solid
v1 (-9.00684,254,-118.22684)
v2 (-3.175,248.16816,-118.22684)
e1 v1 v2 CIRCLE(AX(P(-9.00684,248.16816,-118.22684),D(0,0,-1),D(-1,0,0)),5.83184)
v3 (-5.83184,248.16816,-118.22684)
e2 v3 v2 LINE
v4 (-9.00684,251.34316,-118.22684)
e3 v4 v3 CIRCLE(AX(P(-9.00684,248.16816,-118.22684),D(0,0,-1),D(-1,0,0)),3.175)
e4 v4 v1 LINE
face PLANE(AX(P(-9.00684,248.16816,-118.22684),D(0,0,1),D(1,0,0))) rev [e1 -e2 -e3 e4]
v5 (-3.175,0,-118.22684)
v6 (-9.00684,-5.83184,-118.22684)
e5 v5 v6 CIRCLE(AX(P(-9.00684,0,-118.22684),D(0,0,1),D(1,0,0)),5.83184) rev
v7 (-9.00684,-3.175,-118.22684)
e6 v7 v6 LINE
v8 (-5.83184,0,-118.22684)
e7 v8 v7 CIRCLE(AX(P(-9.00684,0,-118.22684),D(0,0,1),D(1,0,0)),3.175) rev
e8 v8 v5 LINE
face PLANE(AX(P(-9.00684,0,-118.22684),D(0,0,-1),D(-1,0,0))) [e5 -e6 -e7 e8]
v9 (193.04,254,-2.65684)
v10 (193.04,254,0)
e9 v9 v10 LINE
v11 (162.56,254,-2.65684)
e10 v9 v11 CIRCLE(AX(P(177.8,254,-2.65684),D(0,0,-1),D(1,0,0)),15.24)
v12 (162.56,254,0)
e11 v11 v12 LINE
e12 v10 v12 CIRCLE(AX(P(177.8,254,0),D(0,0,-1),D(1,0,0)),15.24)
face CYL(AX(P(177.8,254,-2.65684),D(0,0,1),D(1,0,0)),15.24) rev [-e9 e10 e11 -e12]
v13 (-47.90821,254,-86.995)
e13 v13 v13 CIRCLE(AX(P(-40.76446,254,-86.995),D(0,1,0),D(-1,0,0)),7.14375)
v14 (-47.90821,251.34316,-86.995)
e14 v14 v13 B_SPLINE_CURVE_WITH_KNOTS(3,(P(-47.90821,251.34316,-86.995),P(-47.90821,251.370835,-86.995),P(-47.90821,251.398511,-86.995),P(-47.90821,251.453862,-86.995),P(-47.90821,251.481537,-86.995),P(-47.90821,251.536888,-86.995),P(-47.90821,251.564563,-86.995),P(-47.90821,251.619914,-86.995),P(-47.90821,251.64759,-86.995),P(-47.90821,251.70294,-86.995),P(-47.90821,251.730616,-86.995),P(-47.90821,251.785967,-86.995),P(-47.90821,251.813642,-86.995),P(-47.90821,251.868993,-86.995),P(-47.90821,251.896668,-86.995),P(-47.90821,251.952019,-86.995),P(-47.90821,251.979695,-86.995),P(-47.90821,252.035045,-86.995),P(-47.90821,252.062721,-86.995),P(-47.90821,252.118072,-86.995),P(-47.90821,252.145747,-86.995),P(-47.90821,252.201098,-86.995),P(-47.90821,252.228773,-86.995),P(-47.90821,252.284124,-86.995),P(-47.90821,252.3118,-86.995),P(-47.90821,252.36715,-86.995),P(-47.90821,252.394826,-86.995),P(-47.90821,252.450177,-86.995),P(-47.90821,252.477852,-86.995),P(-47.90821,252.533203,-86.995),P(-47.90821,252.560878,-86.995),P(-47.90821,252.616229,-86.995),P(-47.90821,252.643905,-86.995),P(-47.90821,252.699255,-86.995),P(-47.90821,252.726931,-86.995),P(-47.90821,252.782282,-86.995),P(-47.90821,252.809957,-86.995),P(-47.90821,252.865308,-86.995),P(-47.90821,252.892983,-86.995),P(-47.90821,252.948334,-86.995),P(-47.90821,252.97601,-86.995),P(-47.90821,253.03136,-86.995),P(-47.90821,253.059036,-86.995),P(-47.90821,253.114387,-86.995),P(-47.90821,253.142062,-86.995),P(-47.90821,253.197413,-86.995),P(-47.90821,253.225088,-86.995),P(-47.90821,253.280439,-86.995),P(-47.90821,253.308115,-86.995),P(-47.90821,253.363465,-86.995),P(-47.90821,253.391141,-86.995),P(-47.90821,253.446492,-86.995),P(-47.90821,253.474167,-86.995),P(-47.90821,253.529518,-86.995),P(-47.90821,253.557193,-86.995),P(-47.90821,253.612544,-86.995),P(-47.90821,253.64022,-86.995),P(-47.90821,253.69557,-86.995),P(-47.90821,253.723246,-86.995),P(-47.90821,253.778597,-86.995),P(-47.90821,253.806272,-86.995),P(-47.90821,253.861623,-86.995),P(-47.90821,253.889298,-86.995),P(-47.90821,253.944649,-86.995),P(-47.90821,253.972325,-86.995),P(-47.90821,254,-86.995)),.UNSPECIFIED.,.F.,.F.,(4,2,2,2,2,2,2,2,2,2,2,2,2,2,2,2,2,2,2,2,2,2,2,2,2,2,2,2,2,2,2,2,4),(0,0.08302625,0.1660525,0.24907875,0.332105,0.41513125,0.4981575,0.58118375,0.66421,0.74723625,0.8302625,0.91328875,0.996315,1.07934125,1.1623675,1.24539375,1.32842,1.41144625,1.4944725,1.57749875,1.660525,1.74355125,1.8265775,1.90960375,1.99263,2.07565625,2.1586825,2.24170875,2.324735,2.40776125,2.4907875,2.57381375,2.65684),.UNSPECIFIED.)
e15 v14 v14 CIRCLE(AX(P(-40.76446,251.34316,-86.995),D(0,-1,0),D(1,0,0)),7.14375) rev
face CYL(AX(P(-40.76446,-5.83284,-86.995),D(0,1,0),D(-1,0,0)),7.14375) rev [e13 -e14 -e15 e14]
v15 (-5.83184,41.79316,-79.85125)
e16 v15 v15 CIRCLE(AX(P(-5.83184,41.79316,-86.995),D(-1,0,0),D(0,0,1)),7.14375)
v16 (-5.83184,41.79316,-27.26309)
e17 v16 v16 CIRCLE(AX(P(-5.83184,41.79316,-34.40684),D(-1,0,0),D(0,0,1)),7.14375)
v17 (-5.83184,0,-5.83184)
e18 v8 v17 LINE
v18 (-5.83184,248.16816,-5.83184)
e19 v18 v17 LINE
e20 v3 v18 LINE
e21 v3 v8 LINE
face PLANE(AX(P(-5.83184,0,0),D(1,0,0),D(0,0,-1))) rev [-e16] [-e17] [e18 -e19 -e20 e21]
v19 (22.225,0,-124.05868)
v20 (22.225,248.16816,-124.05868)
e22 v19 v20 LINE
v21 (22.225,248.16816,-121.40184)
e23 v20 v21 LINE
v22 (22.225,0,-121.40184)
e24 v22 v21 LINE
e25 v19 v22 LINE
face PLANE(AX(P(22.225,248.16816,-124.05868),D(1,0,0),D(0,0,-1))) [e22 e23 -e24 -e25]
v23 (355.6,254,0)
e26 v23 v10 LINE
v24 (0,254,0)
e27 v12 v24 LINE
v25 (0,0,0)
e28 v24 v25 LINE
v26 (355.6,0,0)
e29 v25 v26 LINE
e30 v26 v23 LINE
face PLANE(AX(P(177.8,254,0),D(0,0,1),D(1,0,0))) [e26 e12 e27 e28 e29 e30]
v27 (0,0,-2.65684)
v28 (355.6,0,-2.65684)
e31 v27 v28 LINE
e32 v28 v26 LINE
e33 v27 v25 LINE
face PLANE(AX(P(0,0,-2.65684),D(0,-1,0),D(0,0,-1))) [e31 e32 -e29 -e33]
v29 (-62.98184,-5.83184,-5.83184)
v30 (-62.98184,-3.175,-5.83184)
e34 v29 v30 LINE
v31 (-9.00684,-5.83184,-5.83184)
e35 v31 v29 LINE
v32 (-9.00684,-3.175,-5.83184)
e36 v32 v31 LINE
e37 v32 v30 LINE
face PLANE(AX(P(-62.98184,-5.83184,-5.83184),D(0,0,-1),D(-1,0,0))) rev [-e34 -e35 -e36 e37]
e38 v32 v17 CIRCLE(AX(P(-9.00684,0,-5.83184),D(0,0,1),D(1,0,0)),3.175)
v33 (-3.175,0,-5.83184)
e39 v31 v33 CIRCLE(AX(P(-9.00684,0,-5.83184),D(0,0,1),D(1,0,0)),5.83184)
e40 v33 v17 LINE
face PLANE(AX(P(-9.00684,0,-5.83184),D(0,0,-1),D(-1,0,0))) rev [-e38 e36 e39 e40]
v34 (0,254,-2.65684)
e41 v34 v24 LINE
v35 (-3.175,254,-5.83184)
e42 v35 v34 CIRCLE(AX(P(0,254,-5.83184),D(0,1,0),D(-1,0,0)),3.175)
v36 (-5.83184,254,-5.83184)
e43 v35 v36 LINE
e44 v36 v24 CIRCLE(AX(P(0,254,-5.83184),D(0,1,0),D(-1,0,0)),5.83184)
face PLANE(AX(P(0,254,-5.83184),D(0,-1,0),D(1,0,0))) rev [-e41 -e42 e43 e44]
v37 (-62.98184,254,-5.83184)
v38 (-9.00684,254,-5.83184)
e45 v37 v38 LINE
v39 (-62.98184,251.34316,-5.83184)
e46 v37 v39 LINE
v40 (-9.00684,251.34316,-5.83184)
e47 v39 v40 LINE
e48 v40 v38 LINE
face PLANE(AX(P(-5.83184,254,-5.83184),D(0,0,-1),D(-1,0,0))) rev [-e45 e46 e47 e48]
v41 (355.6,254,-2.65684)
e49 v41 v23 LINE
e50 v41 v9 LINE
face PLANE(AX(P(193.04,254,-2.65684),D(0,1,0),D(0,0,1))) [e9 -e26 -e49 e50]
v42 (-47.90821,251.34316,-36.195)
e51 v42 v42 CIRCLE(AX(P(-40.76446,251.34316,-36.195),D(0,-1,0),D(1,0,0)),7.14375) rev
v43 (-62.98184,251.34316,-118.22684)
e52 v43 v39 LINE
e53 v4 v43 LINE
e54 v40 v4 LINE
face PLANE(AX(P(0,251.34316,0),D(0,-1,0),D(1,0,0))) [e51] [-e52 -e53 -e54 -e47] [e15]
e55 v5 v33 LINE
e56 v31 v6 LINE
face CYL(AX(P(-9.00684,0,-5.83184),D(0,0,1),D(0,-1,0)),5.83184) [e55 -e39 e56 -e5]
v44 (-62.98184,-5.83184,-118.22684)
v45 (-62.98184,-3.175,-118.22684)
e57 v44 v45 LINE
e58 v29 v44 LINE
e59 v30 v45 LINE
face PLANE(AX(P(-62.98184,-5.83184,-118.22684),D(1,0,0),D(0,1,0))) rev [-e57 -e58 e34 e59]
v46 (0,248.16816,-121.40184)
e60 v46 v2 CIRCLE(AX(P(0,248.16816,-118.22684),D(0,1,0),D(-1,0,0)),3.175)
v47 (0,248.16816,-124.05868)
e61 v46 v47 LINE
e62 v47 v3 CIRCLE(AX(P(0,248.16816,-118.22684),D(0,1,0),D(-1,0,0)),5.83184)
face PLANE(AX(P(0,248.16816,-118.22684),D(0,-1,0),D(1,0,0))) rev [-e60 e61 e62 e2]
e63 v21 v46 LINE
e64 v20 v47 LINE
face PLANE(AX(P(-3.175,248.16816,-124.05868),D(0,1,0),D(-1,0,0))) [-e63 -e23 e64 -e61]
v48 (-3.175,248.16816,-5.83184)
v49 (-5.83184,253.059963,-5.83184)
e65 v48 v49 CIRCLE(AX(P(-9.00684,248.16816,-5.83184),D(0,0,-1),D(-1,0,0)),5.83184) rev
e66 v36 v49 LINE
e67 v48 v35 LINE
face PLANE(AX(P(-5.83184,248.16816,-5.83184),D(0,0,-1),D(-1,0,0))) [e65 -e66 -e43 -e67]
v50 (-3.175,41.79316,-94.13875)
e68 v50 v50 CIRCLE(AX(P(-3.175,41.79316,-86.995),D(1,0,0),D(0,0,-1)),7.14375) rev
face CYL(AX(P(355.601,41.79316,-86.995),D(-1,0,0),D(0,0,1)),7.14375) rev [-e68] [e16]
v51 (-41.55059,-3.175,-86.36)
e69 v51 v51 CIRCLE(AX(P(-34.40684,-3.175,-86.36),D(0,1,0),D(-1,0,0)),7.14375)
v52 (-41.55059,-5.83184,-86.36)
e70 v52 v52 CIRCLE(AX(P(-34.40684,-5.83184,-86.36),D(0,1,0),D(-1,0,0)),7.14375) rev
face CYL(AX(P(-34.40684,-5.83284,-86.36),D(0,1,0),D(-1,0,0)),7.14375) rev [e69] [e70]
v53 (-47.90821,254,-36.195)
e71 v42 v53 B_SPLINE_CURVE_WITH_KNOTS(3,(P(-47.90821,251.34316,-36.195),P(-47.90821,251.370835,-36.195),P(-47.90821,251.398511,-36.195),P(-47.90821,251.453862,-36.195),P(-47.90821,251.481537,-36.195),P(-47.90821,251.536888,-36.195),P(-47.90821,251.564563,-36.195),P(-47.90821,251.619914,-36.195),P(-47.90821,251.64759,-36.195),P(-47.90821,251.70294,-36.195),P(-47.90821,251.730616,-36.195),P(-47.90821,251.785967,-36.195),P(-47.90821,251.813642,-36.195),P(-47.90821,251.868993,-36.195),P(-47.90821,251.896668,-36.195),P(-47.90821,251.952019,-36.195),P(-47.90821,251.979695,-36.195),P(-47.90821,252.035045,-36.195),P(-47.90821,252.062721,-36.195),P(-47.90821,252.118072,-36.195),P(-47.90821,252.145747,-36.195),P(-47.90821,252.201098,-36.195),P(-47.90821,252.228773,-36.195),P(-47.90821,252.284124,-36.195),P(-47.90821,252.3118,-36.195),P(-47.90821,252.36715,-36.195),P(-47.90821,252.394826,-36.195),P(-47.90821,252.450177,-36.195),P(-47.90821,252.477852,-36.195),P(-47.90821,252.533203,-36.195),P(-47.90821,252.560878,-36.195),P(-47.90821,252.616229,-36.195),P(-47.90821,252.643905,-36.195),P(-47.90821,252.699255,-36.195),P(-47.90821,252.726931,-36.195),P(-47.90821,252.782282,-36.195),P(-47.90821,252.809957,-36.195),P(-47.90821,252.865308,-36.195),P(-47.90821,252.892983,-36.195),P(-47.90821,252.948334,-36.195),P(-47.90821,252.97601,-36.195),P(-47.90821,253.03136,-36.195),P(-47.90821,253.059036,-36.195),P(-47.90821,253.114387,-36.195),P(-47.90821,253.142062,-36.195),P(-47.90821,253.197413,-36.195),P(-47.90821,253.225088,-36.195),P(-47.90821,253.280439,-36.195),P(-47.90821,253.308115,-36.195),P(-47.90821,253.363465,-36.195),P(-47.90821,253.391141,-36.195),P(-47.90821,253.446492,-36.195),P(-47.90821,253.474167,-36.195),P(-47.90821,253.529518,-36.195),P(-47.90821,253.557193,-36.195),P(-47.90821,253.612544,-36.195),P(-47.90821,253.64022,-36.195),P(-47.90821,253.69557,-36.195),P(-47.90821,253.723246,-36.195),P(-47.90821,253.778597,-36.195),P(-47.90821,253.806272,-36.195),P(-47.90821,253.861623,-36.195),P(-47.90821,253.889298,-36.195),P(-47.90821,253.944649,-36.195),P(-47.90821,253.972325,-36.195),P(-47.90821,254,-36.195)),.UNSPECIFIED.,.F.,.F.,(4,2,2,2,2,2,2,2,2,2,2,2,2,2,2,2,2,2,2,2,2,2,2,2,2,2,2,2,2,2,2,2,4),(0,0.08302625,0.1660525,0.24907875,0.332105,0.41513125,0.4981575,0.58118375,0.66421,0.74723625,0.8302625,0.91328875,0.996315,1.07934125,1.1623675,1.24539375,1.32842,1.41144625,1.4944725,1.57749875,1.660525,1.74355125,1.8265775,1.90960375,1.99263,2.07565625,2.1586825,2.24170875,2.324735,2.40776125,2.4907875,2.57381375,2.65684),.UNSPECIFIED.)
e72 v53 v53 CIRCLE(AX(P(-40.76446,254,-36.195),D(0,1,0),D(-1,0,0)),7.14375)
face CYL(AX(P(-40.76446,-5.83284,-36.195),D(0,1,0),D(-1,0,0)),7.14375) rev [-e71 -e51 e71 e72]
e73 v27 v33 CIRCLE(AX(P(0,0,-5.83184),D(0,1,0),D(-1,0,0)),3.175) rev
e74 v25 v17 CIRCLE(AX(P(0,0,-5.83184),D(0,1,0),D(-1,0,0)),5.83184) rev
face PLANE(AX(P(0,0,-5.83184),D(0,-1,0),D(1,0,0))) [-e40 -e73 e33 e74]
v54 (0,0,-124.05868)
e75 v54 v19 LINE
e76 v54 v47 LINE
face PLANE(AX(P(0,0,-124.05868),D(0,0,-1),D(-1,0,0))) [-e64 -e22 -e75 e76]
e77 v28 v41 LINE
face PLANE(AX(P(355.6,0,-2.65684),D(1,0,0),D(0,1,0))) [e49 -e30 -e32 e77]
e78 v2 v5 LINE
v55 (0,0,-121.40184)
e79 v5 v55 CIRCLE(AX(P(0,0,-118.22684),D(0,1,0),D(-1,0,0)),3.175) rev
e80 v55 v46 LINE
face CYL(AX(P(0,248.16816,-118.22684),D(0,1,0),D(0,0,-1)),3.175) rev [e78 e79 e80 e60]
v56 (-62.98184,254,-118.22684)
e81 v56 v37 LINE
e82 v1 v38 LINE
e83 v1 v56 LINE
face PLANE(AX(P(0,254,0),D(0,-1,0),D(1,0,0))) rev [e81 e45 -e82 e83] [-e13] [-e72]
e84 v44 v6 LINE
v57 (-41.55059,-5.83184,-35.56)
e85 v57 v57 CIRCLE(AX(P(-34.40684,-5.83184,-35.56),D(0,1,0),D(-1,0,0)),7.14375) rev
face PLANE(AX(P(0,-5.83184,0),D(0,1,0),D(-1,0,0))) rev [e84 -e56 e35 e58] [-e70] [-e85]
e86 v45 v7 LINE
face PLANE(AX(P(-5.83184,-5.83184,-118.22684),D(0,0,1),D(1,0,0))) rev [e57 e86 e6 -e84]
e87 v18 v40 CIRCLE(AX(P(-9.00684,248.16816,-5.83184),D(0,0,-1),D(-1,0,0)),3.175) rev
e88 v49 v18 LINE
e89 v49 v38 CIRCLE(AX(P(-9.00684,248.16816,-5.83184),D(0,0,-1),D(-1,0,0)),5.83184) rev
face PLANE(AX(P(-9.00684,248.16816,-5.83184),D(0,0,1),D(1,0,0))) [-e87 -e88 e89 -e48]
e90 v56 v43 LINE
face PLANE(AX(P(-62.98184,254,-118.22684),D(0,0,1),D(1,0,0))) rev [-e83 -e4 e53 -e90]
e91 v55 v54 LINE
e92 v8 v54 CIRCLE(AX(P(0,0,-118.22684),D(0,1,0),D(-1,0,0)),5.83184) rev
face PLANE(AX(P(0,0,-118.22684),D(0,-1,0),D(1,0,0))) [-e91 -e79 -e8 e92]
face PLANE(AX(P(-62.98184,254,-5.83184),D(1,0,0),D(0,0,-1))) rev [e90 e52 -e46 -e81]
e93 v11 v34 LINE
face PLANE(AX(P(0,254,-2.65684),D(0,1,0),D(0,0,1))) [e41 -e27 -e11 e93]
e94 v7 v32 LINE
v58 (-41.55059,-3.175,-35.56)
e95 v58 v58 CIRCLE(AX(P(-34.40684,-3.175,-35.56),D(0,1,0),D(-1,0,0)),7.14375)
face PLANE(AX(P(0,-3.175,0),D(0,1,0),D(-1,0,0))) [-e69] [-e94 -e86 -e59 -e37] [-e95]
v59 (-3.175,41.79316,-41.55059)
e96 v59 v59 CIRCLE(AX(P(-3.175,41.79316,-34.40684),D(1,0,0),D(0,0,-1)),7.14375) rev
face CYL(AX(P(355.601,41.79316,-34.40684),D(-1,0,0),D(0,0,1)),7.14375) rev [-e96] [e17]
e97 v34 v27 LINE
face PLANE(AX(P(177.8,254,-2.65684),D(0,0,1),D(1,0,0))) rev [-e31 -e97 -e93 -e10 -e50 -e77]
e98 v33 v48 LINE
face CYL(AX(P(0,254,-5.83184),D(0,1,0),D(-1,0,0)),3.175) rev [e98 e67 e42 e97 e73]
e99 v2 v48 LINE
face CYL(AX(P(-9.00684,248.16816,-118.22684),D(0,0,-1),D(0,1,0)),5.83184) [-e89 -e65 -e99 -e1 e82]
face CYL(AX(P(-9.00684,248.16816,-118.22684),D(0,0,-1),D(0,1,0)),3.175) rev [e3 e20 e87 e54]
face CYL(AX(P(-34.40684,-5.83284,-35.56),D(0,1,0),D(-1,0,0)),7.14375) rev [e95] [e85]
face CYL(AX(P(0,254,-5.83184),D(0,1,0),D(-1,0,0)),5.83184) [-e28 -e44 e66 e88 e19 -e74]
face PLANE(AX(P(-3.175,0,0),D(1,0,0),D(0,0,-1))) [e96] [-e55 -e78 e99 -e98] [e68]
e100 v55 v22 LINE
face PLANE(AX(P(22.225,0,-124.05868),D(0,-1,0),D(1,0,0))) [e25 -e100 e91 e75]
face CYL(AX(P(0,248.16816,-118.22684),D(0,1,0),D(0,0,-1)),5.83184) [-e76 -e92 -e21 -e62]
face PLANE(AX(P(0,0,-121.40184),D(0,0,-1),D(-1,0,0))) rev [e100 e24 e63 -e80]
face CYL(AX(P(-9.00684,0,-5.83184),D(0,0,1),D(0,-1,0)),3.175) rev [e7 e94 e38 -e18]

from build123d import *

# Parameters (mm, degrees)
BASE_FLANGE1_DEPTH           = 2.65684
EDGE_FLANGE1_DEPTH           = 254
EDGE_FLANGE2_STRIP_W         = 16.97736
EDGE_FLANGE2_STRIP_H         = 2.65684
EDGE_FLANGE2_STRIP_CUT_DEPTH = 112.395
EDGE_FLANGE2_DEPTH           = 112.395
EDGE_FLANGE3_DEPTH           = 112.395
EDGE_FLANGE4_DEPTH           = 248.16816
SKETCH22_R                   = 7.14375
CUT_EXTRUDE1_DEPTH           = 2.65684
SKETCH23_R                   = 7.14375
CUT_EXTRUDE2_DEPTH           = 2.65684
SKETCH24_R                   = 7.14375
CUT_EXTRUDE3_DEPTH           = 2.65684


# Sheet-metal steps are written as plain solids
with BuildPart() as part:
    # Sketch1 → Base-Flange1 (new body)
    with BuildSketch(Plane.XY):
        with BuildLine():
            Line((0, 0), (355.6, 0))
            Line((355.6, 0), (355.6, 254))
            Line((355.6, 254), (193.04, 254))
            ThreePointArc((193.04, 254), (177.8, 238.76), (162.56, 254))
            Line((162.56, 254), (0, 254))
            Line((0, 254), (0, 0))
        make_face()
    extrude(amount=-BASE_FLANGE1_DEPTH)

    # Edge-Flange1 section (across the edge) → Edge-Flange1 (add)
    with BuildSketch(Plane(origin=(-3.175, 0, -2.65684), x_dir=(1, 0, 0), z_dir=(0, 1, 0))):
        with BuildLine():
            Line((-2.65684, 3.175), (-2.65684, 115.57))
            Line((-2.65684, 115.57), (0, 115.57))
            Line((0, 115.57), (0, 3.175))
            ThreePointArc((0, 3.175), (0.92993597, 0.92993597), (3.175, 0))
            Line((3.175, 0), (3.175, -2.65684))
            ThreePointArc((3.175, -2.65684), (-0.948733611, -0.948733611), (-2.65684, 3.175))
        make_face()
    extrude(amount=EDGE_FLANGE1_DEPTH)

    # Edge-Flange2 strip (across the edge) → Edge-Flange2 strip cut (cut)
    with BuildSketch(Plane(origin=(-5.83184, 254, -5.83184), x_dir=(0, -1, 0), z_dir=(0, 0, -1))):
        with Locations((-2.65684, -1.32842)):
            Rectangle(EDGE_FLANGE2_STRIP_W, EDGE_FLANGE2_STRIP_H)
    extrude(amount=EDGE_FLANGE2_STRIP_CUT_DEPTH, mode=Mode.SUBTRACT)

    # Edge-Flange2 section (across the edge) → Edge-Flange2 (add)
    with BuildSketch(Plane(origin=(-5.83184, 254, -5.83184), x_dir=(0, -1, 0), z_dir=(0, 0, -1))):
        with BuildLine():
            Line((0, 3.175), (0, 57.15))
            Line((0, 57.15), (2.65684, 57.15))
            Line((2.65684, 57.15), (2.65684, 3.175))
            ThreePointArc((2.65684, 3.175), (3.58677597, 0.92993597), (5.83184, 0))
            Line((5.83184, 0), (5.83184, -2.65684))
            ThreePointArc((5.83184, -2.65684), (1.708106389, -0.948733611), (0, 3.175))
        make_face()
    extrude(amount=EDGE_FLANGE2_DEPTH)

    # Edge-Flange3 section (across the edge) → Edge-Flange3 (add)
    with BuildSketch(Plane(origin=(-5.83184, -3.175, -118.22684), x_dir=(0, 1, 0), z_dir=(0, 0, 1))):
        with BuildLine():
            Line((-2.65684, 3.175), (-2.65684, 57.15))
            Line((-2.65684, 57.15), (0, 57.15))
            Line((0, 57.15), (0, 3.175))
            ThreePointArc((0, 3.175), (0.92993597, 0.92993597), (3.175, 0))
            Line((3.175, 0), (3.175, -2.65684))
            ThreePointArc((3.175, -2.65684), (-0.948733611, -0.948733611), (-2.65684, 3.175))
        make_face()
    extrude(amount=EDGE_FLANGE3_DEPTH)

    # Edge-Flange4 section (across the edge) → Edge-Flange4 (add)
    with BuildSketch(Plane(origin=(-3.175, 0, -121.40184), x_dir=(0, 0, 1), z_dir=(0, 1, 0))):
        with BuildLine():
            Line((-2.65684, 3.175), (-2.65684, 25.4))
            Line((-2.65684, 25.4), (0, 25.4))
            Line((0, 25.4), (0, 3.175))
            ThreePointArc((0, 3.175), (0.92993597, 0.92993597), (3.175, 0))
            Line((3.175, 0), (3.175, -2.65684))
            ThreePointArc((3.175, -2.65684), (-0.948733611, -0.948733611), (-2.65684, 3.175))
        make_face()
    extrude(amount=EDGE_FLANGE4_DEPTH)

    # Sketch22 → Cut-Extrude1 (cut)
    with BuildSketch(Plane(origin=(0, 254, 0), x_dir=(1, 0, 0), z_dir=(0, 1, 0))):
        with Locations(Location((-40.76446, 86.995, 0), (0, 0, 180))):
            Circle(SKETCH22_R)
        with Locations(Location((-40.76446, 36.195, 0), (0, 0, 180))):
            Circle(SKETCH22_R)
    extrude(amount=-CUT_EXTRUDE1_DEPTH, mode=Mode.SUBTRACT)

    # Sketch23 → Cut-Extrude2 (cut)
    with BuildSketch(Plane(origin=(0, -3.175, 0), x_dir=(1, 0, 0), z_dir=(0, 1, 0))):
        with Locations(Location((-34.40684, 86.36, 0), (0, 0, 180))):
            Circle(SKETCH23_R)
        with Locations(Location((-34.40684, 35.56, 0), (0, 0, 180))):
            Circle(SKETCH23_R)
    extrude(amount=-CUT_EXTRUDE2_DEPTH, mode=Mode.SUBTRACT)

    # Sketch24 → Cut-Extrude3 (cut)
    with BuildSketch(Plane.ZY.offset(5.83184)):
        with Locations((-86.995, 41.79316)):
            Circle(SKETCH24_R)
        with Locations((-34.40684, 41.79316)):
            Circle(SKETCH24_R)
    extrude(amount=-CUT_EXTRUDE3_DEPTH, mode=Mode.SUBTRACT)


solid = part.part
